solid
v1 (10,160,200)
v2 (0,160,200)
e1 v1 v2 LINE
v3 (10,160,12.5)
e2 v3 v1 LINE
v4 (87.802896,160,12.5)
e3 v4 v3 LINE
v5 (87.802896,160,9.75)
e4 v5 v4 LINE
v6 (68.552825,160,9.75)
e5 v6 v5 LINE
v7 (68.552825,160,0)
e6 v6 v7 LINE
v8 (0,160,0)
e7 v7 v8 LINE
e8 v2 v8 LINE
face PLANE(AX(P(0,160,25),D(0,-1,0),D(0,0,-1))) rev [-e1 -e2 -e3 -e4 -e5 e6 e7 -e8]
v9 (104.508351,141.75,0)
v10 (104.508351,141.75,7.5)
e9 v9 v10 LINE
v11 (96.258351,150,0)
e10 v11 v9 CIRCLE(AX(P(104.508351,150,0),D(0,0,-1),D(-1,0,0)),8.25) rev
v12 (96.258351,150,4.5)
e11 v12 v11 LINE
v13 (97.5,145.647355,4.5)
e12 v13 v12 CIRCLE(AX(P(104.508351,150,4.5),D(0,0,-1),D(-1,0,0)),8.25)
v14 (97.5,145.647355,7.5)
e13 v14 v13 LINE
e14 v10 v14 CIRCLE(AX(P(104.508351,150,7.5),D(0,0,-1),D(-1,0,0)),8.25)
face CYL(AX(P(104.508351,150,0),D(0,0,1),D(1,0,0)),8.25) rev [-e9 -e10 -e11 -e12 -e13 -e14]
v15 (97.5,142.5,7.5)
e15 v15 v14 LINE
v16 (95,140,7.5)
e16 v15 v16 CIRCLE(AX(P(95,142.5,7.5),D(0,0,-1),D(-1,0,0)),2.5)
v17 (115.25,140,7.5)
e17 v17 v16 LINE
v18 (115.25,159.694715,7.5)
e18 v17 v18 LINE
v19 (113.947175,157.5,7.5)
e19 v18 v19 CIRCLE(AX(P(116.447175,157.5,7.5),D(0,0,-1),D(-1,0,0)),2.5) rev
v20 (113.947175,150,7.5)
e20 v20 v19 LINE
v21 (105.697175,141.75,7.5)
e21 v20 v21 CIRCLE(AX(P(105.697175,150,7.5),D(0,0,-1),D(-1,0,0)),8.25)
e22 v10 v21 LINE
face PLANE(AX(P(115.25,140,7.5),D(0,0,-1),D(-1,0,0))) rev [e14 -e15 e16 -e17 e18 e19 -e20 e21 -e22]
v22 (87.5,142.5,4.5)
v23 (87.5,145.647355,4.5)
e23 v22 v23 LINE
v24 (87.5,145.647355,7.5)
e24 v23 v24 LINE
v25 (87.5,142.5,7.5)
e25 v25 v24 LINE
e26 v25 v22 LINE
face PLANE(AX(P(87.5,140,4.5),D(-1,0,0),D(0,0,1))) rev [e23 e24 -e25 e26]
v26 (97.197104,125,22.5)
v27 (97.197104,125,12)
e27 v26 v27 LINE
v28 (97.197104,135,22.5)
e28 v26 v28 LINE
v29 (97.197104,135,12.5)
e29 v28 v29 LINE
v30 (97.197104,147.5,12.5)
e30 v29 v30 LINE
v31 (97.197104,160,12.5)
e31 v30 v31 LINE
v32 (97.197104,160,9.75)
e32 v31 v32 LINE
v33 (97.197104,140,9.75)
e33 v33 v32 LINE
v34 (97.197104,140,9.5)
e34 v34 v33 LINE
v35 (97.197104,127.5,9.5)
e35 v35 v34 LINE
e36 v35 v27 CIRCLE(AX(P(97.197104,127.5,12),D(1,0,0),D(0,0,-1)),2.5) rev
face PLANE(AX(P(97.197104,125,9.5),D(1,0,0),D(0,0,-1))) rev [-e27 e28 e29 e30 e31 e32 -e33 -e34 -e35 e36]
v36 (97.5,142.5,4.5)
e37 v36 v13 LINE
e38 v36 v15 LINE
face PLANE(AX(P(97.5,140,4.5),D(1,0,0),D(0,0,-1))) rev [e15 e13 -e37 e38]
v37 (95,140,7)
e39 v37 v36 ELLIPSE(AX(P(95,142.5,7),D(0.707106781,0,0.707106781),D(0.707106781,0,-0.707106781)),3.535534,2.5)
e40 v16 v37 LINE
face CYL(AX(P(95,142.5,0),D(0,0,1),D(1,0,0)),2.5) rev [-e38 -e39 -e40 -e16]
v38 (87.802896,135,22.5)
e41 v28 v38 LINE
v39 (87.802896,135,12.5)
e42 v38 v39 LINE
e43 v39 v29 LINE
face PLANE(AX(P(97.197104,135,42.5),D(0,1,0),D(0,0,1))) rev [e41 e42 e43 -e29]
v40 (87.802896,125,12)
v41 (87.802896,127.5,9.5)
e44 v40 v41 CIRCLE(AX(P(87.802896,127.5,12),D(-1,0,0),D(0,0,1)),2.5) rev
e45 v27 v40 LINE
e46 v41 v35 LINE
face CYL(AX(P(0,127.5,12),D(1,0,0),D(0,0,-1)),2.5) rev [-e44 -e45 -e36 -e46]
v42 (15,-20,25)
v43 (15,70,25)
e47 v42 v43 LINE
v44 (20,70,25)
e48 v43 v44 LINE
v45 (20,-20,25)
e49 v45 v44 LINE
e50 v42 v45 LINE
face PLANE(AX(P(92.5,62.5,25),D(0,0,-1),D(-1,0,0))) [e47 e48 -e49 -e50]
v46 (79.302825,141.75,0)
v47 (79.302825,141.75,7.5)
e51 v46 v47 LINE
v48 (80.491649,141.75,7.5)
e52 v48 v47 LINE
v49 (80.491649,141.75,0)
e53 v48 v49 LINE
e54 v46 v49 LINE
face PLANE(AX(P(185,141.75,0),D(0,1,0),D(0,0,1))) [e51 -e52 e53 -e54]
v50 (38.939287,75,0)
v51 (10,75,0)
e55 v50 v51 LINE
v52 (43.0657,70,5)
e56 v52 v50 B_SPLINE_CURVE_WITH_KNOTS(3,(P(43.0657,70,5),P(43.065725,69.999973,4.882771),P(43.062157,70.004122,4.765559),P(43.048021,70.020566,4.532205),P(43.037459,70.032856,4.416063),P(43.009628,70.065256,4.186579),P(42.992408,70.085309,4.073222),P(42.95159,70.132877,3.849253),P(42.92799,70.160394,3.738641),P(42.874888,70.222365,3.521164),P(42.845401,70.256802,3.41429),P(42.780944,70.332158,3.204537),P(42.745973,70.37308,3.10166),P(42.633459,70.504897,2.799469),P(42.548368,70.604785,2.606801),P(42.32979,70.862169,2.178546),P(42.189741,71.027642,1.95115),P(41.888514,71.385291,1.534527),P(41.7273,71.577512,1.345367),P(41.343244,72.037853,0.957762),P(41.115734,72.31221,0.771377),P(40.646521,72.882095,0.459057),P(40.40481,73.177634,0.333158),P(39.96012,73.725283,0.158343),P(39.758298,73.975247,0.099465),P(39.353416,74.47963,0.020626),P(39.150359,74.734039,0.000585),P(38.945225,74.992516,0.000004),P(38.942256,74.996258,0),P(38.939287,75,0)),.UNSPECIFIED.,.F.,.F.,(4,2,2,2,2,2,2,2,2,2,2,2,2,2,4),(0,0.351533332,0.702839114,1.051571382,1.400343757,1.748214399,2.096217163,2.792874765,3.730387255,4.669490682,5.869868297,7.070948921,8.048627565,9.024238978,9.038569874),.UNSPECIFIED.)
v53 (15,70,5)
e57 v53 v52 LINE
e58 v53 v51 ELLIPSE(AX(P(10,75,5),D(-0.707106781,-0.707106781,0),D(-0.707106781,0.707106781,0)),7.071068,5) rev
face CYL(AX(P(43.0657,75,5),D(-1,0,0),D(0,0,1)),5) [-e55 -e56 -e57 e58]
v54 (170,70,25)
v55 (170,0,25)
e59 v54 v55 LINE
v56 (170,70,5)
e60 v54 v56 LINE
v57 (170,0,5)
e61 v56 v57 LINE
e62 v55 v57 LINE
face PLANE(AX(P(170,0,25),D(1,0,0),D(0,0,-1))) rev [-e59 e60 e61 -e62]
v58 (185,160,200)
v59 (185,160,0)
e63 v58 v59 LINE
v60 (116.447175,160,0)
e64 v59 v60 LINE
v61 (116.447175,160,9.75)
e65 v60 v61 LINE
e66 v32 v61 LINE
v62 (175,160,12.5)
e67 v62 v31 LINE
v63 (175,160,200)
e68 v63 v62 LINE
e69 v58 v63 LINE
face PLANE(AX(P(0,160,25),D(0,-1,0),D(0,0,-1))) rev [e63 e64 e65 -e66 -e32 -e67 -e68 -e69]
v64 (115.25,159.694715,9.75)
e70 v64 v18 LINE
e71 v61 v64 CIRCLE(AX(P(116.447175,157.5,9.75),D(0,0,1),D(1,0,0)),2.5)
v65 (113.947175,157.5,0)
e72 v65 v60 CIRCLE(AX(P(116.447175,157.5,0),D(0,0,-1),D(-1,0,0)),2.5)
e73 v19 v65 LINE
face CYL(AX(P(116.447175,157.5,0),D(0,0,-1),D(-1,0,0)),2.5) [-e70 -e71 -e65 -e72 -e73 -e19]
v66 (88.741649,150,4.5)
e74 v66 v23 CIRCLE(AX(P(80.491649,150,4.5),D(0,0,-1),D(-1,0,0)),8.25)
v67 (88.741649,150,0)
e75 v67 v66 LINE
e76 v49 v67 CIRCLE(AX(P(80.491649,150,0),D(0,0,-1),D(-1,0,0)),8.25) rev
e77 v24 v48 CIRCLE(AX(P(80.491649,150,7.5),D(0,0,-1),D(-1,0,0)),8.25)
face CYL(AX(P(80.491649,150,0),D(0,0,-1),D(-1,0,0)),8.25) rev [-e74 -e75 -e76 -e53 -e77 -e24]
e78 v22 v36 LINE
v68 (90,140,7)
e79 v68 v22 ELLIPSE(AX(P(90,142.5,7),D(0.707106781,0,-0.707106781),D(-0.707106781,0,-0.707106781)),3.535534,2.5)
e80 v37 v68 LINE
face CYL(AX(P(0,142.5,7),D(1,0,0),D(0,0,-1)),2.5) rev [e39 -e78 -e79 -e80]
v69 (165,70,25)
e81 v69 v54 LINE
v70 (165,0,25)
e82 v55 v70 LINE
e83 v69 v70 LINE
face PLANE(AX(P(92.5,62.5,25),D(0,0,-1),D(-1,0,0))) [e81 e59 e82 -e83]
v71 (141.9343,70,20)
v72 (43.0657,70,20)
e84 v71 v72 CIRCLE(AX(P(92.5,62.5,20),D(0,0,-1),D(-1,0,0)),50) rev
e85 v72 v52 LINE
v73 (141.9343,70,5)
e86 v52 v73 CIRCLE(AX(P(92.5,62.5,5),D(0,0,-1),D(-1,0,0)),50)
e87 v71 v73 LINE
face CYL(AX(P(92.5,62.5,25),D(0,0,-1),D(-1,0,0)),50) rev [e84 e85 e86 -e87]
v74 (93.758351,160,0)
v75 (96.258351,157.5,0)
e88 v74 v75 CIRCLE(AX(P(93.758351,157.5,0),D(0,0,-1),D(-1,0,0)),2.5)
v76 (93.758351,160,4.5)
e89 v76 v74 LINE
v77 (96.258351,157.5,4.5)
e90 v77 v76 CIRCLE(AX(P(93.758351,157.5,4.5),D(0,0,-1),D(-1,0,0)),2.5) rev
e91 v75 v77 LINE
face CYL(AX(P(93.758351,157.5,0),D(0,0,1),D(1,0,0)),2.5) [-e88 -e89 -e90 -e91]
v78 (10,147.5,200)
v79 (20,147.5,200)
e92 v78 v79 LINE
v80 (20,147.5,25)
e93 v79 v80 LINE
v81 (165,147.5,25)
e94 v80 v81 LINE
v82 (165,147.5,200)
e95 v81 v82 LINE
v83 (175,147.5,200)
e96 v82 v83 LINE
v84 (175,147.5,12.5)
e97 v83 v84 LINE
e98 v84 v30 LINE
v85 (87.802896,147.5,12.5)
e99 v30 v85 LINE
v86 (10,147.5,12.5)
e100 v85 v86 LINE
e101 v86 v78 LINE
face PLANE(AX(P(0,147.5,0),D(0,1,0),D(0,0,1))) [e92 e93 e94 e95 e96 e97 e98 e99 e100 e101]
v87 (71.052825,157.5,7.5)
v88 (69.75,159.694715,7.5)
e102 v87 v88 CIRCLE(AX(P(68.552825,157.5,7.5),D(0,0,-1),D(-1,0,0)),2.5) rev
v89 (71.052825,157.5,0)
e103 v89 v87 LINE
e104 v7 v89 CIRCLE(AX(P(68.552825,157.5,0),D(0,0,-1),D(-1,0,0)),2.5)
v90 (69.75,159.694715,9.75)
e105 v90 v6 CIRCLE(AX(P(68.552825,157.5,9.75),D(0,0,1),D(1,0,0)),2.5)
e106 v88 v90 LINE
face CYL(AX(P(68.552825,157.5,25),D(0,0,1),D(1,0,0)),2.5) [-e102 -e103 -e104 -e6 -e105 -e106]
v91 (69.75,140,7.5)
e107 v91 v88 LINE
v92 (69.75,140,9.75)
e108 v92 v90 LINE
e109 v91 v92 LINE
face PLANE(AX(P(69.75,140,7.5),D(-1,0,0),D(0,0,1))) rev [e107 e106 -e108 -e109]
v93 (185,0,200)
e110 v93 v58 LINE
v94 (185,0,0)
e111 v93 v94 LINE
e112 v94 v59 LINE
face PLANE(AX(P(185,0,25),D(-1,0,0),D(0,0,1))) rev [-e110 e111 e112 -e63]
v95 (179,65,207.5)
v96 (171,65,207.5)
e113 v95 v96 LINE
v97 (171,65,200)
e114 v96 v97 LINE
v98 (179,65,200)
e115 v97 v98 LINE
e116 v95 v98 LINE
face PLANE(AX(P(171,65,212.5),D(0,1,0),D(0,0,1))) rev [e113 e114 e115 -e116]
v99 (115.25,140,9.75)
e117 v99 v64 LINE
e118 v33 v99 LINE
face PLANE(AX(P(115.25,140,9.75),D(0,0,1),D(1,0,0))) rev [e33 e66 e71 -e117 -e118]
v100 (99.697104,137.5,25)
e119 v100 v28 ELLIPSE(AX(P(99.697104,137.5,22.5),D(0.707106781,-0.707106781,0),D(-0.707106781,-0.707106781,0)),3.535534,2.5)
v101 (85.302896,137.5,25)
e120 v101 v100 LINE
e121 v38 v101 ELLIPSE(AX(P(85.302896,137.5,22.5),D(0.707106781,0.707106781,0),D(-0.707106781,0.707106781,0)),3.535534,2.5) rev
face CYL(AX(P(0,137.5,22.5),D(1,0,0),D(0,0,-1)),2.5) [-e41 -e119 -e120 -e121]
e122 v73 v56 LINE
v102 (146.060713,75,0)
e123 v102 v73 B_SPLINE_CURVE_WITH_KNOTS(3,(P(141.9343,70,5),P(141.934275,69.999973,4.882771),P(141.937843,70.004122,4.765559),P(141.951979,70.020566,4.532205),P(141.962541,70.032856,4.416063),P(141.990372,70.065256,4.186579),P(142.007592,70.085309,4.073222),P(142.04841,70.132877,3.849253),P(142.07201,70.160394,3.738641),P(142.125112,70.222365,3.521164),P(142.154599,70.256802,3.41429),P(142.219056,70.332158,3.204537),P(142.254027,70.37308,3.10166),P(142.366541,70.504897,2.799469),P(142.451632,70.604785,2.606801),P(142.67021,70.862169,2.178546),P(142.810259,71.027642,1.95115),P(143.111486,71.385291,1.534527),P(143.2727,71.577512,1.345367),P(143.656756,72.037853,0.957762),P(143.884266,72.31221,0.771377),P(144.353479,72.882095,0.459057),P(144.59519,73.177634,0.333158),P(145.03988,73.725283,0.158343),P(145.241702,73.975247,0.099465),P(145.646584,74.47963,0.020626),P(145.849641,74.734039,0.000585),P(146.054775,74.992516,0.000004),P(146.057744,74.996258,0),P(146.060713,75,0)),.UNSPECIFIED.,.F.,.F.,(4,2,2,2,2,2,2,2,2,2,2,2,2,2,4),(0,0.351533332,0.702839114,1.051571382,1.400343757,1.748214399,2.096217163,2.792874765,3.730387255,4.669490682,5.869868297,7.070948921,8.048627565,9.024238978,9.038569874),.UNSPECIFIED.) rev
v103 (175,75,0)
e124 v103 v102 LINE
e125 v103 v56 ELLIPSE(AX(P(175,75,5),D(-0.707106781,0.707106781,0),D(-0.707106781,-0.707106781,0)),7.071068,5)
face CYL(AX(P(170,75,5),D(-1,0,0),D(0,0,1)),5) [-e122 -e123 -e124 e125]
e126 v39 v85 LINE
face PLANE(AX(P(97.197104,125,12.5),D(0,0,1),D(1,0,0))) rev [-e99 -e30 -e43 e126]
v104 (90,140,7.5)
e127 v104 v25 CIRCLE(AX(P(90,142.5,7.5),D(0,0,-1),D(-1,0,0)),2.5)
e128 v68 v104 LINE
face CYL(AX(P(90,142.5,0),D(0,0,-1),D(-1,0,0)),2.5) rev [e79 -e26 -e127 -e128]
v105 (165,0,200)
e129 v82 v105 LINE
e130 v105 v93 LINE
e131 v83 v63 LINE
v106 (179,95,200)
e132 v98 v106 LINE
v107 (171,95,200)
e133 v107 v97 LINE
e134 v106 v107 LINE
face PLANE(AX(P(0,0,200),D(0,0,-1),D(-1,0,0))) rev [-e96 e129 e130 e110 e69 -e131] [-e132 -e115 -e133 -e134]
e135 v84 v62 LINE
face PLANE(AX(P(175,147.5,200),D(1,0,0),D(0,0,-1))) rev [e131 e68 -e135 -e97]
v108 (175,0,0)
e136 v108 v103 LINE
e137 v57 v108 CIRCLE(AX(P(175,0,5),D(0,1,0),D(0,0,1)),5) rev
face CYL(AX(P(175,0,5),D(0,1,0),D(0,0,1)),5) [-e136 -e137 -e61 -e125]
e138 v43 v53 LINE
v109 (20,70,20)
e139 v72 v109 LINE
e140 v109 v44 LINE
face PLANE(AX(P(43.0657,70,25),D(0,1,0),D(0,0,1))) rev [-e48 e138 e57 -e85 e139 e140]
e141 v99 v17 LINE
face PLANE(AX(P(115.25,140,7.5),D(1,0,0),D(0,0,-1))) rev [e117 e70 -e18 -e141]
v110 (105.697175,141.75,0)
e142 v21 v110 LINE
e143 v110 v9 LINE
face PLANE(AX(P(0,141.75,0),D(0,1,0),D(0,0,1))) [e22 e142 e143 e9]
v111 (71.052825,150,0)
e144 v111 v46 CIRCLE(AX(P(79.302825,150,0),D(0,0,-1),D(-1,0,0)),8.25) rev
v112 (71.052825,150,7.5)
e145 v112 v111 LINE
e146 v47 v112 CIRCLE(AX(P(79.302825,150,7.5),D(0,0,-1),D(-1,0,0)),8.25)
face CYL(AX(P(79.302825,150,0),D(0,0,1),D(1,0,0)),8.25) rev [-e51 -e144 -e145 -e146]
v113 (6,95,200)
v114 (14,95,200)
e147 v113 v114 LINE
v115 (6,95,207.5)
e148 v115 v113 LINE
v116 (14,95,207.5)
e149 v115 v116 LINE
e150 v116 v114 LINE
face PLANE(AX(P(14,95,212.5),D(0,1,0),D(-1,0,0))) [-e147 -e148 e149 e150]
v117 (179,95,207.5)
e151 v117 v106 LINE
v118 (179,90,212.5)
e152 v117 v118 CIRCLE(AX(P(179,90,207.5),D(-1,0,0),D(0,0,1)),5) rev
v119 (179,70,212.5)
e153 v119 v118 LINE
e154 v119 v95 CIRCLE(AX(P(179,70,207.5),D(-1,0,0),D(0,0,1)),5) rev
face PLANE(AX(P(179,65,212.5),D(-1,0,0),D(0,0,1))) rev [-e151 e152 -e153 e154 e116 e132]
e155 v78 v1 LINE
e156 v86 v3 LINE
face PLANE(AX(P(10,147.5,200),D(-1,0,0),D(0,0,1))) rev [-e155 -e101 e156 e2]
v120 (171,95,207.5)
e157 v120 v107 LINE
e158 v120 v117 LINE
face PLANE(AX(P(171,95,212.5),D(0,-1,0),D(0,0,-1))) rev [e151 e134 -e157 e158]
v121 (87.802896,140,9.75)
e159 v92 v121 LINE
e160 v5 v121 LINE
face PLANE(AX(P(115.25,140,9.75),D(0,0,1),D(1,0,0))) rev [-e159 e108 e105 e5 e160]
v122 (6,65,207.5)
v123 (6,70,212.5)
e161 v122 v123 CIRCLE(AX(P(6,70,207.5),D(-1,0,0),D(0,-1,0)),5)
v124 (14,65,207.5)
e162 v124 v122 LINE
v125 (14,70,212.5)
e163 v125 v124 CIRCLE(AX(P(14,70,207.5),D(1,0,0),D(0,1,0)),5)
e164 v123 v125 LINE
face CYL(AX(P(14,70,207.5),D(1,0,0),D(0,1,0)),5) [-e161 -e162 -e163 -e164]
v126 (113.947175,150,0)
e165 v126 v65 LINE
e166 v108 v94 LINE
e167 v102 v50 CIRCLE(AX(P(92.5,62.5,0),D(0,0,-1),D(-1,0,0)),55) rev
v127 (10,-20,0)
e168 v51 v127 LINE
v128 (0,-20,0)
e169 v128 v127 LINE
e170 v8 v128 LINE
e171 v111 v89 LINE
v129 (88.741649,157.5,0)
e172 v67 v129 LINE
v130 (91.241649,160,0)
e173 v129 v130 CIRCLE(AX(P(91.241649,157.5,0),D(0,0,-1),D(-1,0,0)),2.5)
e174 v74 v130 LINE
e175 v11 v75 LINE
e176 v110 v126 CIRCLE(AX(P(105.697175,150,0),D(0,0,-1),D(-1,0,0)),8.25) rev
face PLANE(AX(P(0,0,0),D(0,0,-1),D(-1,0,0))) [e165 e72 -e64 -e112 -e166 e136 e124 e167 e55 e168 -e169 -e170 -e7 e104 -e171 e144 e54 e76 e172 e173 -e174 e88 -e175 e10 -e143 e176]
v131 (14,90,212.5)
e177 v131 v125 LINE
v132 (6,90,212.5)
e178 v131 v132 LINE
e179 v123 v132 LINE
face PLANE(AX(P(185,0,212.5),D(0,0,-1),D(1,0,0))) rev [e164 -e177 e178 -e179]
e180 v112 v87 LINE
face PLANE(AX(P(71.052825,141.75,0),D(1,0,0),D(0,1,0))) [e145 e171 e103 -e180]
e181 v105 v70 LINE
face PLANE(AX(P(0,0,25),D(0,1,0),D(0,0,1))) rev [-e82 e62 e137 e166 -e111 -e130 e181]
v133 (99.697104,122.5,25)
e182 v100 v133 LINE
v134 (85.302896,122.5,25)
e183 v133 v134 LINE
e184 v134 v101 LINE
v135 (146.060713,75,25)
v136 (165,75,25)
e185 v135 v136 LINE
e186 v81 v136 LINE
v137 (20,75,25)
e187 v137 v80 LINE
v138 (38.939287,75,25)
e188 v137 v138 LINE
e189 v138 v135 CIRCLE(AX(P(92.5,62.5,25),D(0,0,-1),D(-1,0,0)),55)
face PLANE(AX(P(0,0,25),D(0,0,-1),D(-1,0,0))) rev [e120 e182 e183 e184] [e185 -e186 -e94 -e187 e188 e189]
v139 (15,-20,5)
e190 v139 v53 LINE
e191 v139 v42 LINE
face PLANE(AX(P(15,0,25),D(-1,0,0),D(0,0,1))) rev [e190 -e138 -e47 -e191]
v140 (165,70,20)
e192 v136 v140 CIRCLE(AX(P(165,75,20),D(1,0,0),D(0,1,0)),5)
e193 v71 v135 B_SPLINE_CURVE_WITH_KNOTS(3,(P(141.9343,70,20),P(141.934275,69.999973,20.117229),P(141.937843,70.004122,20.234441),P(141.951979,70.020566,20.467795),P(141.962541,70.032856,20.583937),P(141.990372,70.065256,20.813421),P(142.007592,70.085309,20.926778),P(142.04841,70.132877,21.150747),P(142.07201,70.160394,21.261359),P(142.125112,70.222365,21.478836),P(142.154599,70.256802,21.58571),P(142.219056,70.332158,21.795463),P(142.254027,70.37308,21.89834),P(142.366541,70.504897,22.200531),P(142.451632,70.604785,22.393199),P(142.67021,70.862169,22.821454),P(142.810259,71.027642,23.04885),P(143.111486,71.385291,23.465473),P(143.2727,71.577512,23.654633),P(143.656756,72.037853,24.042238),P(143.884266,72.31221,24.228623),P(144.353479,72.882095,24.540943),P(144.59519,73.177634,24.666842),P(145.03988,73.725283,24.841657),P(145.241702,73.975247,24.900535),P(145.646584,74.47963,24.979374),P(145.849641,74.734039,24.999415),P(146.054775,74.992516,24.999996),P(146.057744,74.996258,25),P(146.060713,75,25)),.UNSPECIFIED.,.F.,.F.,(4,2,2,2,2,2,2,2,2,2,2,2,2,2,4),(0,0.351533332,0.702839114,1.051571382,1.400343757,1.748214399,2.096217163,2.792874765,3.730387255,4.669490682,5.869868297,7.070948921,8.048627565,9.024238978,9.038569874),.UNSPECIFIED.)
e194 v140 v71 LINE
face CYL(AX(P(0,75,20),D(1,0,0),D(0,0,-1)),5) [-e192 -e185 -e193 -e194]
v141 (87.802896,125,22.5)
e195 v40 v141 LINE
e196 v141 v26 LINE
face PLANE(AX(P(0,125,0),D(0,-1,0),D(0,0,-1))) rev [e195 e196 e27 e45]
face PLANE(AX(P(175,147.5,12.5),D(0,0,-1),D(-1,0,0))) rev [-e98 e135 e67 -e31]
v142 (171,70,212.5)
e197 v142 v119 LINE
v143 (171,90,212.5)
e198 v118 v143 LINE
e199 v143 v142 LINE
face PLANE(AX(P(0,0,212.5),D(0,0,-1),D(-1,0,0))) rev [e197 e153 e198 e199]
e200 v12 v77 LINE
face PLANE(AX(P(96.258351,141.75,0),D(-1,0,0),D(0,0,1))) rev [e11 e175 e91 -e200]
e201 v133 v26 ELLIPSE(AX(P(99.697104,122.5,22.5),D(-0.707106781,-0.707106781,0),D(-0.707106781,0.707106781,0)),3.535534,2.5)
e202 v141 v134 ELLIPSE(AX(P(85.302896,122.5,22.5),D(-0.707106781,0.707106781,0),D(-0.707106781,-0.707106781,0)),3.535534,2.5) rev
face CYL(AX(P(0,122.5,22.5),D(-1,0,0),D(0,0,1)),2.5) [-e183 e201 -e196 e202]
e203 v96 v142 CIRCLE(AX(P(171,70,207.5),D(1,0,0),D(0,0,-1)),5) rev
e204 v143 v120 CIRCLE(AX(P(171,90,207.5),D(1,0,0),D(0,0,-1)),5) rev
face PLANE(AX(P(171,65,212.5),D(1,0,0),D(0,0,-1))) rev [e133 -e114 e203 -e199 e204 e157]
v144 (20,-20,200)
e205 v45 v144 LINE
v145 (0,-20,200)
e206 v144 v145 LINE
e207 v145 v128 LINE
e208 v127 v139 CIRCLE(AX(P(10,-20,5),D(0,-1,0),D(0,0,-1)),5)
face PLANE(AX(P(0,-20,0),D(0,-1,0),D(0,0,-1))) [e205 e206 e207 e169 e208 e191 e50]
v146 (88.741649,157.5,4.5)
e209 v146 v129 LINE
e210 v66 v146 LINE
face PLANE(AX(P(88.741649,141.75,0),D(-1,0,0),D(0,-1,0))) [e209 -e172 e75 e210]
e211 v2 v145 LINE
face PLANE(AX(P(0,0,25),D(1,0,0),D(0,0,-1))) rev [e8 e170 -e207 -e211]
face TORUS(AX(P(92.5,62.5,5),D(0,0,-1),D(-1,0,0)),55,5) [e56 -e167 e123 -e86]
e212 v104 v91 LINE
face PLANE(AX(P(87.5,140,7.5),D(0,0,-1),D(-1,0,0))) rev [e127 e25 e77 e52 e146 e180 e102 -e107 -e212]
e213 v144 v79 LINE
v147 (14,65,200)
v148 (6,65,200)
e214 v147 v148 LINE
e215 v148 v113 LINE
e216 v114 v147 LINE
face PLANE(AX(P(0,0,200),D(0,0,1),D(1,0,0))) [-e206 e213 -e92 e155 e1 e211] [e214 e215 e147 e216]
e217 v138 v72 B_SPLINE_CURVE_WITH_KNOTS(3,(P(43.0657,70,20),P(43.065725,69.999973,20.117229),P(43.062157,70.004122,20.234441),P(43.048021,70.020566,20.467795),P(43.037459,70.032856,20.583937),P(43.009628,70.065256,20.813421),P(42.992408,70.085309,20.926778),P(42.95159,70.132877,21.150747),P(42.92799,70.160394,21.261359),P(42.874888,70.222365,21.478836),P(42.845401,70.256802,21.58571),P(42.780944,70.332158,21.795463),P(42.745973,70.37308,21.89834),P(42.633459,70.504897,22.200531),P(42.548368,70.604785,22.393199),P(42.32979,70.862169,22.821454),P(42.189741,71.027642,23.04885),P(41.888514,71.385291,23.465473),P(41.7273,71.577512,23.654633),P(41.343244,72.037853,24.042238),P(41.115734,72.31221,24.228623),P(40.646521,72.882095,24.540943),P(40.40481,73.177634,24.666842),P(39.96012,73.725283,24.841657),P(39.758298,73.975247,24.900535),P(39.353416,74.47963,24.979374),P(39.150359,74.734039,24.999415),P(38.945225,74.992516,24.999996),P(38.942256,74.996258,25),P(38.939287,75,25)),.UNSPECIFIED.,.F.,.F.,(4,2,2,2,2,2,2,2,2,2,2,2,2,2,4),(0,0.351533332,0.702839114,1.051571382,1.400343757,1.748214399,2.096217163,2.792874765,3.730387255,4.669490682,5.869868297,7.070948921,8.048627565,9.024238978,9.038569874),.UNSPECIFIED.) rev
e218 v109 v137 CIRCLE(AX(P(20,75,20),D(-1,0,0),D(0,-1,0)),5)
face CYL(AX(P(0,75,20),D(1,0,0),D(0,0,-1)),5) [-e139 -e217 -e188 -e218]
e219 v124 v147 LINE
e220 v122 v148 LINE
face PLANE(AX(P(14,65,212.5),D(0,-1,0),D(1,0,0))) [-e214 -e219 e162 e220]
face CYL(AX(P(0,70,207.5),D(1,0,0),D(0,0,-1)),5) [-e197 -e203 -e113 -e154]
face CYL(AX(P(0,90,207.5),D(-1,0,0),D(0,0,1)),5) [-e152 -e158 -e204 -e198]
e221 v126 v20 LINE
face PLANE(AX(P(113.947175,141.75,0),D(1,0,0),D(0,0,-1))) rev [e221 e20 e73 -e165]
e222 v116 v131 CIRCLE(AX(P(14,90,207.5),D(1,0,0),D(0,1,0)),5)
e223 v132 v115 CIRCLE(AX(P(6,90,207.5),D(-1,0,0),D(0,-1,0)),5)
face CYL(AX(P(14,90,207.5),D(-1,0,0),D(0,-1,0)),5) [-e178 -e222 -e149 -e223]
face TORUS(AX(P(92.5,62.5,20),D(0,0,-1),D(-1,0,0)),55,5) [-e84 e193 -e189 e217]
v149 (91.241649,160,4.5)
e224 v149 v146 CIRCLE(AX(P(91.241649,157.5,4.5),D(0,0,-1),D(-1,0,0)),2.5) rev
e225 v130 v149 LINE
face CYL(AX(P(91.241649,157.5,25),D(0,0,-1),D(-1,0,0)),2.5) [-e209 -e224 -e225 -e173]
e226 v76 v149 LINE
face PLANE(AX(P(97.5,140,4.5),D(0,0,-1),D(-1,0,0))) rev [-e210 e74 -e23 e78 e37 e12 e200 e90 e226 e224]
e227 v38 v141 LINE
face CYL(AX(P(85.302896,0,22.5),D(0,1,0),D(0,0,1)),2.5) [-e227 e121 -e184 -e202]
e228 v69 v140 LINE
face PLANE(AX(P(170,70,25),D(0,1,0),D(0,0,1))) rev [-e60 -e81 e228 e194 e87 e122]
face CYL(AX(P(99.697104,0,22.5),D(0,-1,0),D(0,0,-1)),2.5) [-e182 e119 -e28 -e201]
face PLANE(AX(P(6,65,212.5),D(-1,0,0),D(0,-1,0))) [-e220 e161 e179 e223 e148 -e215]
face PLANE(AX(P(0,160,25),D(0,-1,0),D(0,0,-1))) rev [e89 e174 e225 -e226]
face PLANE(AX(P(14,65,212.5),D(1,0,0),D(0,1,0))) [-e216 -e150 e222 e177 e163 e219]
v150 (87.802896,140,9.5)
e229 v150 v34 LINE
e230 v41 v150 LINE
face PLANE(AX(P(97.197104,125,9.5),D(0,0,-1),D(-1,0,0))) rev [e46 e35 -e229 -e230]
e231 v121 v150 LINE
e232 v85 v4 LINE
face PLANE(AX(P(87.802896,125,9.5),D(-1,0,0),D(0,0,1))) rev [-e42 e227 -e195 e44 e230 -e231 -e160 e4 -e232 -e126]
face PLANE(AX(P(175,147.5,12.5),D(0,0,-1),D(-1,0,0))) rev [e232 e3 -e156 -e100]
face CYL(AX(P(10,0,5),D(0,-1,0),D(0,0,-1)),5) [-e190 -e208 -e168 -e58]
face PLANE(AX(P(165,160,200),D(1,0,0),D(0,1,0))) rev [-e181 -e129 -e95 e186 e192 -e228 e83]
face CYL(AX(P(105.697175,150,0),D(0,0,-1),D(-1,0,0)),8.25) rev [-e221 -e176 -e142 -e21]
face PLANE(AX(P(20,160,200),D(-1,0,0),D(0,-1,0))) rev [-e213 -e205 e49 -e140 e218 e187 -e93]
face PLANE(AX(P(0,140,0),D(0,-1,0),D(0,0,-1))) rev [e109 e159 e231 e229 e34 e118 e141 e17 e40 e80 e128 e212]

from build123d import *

# Parameters (mm, degrees)
SKETCH1_W            = 185
SKETCH1_H            = 160
BOSS_EXTRUDE1_DEPTH  = 25
SKETCH2_W            = 20
SKETCH2_H            = 160
BOSS_EXTRUDE2_DEPTH  = 175
SKETCH5_W            = 20
SKETCH5_H            = 200
BOSS_EXTRUDE3_DEPTH  = 20
CUT_EXTRUDE1_DEPTH   = 25
SKETCH6_W            = 5
SKETCH6_H            = 25
CUT_EXTRUDE2_DEPTH   = 20
FILLET2_R            = 5
SKETCH7_W            = 8
SKETCH7_H            = 30
BOSS_EXTRUDE4_DEPTH  = 12.5
FILLET3_R            = 5
FILLET3_OF_MIRROR1_R = 5
SKETCH8_W            = 165
SKETCH8_H            = 187.5
CUT_EXTRUDE3_DEPTH   = 12.5
SKETCH10_R           = 8.25
CUT_EXTRUDE4_DEPTH   = 7.5
CUT_EXTRUDE5_DEPTH   = 20
SKETCH12_W           = 17.688824297
SKETCH12_H           = 7.5
CUT_EXTRUDE6_DEPTH   = 18.25
FILLET4_R            = 8.25
FILLET4_OF_MIRROR2_R = 8.25
SKETCH14_W           = 9.39420862
SKETCH14_H           = 3
CUT_EXTRUDE7_DEPTH   = 35
SKETCH15_W           = 9.39420862
SKETCH15_H           = 10
CUT_EXTRUDE8_DEPTH   = 30
FILLET5_R            = 2.5


with BuildPart() as part:
    # Sketch1 → Boss-Extrude1 (new body)
    with BuildSketch(Plane.XY):
        with Locations((92.5, 80)):
            Rectangle(SKETCH1_W, SKETCH1_H)
    extrude(amount=BOSS_EXTRUDE1_DEPTH)

    # Sketch2 → Boss-Extrude2 (add)
    with BuildSketch(Plane.XY.offset(25)):
        with Locations((10, 80)):
            Rectangle(SKETCH2_W, SKETCH2_H)
        with Locations((175, 80)):
            Rectangle(SKETCH2_W, SKETCH2_H)
    extrude(amount=BOSS_EXTRUDE2_DEPTH)

    # Sketch5 → Boss-Extrude3 (add)
    with BuildSketch(Plane.XZ):
        with Locations((10, 100)):
            Rectangle(SKETCH5_W, SKETCH5_H)
    extrude(amount=BOSS_EXTRUDE3_DEPTH)

    # Sketch3 → Cut-Extrude1 (cut)
    with BuildSketch(Plane(origin=(0, 0, 0), x_dir=(-1, 0, 0), z_dir=(0, 0, -1))):
        with BuildLine():
            Line((-170, 0), (-15, 0))
            Line((-15, 0), (-15, 70))
            Line((-15, 70), (-43.065700167, 70))
            ThreePointArc((-43.065700167, 70), (-92.5, 112.5), (-141.934299833, 70))
            Line((-141.934299833, 70), (-170, 70))
            Line((-170, 70), (-170, 0))
        make_face()
    extrude(amount=-CUT_EXTRUDE1_DEPTH, mode=Mode.SUBTRACT)

    # Sketch6 → Cut-Extrude2 (cut)
    with BuildSketch(Plane(origin=(0, 0, 0), x_dir=(1, 0, 0), z_dir=(0, 1, 0))):
        with Locations((17.5, -12.5)):
            Rectangle(SKETCH6_W, SKETCH6_H)
    extrude(amount=-CUT_EXTRUDE2_DEPTH, mode=Mode.SUBTRACT)

    # Fillet2
    fillet2_edges = [part.edges().sort_by_distance(p)[0] for p in [
        (153.467149917, 70, 25),
        (92.5, 112.5, 25),
        (31.532850083, 70, 25),
        (170, 35, 0),
        (15, 25, 0),
        (29.032850083, 70, 0),
        (92.5, 112.5, 0),
        (155.967149917, 70, 0),
    ]]
    fillet(fillet2_edges, radius=FILLET2_R)

    # Sketch7 → Boss-Extrude4 (add)
    with BuildSketch(Plane.XY.offset(200)):
        with Locations((175, 80)):
            Rectangle(SKETCH7_W, SKETCH7_H)
    boss_extrude4 = extrude(amount=BOSS_EXTRUDE4_DEPTH)

    # Fillet3
    fillet3_edges = [part.edges().sort_by_distance(p)[0] for p in [
        (175, 95, 212.5),
        (175, 65, 212.5),
    ]]
    fillet(fillet3_edges, radius=FILLET3_R)

    # Mirror1: Boss-Extrude4 across plane
    add(boss_extrude4.mirror(Plane.ZY.offset(-92.5)))

    # Fillet3 of Mirror1
    fillet3_of_mirror1_edges = [part.edges().sort_by_distance(p)[0] for p in [
        (10, 95, 212.5),
        (10, 65, 212.5),
    ]]
    fillet(fillet3_of_mirror1_edges, radius=FILLET3_OF_MIRROR1_R)

    # Sketch8 → Cut-Extrude3 (cut)
    with BuildSketch(Plane(origin=(0, 160, 0), x_dir=(1, 0, 0), z_dir=(0, 1, 0))):
        with Locations((92.5, -106.25)):
            Rectangle(SKETCH8_W, SKETCH8_H)
    extrude(amount=-CUT_EXTRUDE3_DEPTH, mode=Mode.SUBTRACT)

    # Sketch10 → Cut-Extrude4 (cut)
    with BuildSketch(Plane(origin=(0, 0, 0), x_dir=(-1, 0, 0), z_dir=(0, 0, -1))):
        with Locations((-105, 150)):
            Circle(SKETCH10_R)
        with Locations(Location((-80, 150, 0), (0, 0, 180))):
            Circle(SKETCH10_R)
    extrude(amount=-CUT_EXTRUDE4_DEPTH, mode=Mode.SUBTRACT)

    # Sketch11 → Cut-Extrude5 (cut)
    with BuildSketch(Plane(origin=(0, 160, 0), x_dir=(1, 0, 0), z_dir=(0, 1, 0))):
        Polygon((87.5, -7.5), (69.75, -7.5), (69.75, -9.75), (115.25, -9.75), (115.25, -7.5), (97.5, -7.5), (97.5, -4.5), (87.5, -4.5), align=None)
    extrude(amount=-CUT_EXTRUDE5_DEPTH, mode=Mode.SUBTRACT)

    # Sketch12 → Cut-Extrude6 (cut)
    with BuildSketch(Plane(origin=(0, 160, 0), x_dir=(1, 0, 0), z_dir=(0, 1, 0))):
        with Locations((105.102762798, -3.75)):
            Rectangle(SKETCH12_W, SKETCH12_H)
    cut_extrude6 = extrude(amount=-CUT_EXTRUDE6_DEPTH, mode=Mode.SUBTRACT)

    # Fillet4
    fillet4_edges = [part.edges().sort_by_distance(p)[0] for p in [
        (96.258350649, 141.75, 2.25),
        (113.947174946, 141.75, 3.75),
    ]]
    fillet(fillet4_edges, radius=FILLET4_R)

    # Mirror2: Cut-Extrude6 across plane
    add(cut_extrude6.mirror(Plane.ZY.offset(-92.5)), mode=Mode.SUBTRACT)

    # Fillet4 of Mirror2
    fillet4_of_mirror2_edges = [part.edges().sort_by_distance(p)[0] for p in [
        (88.741649351, 141.75, 2.25),
        (71.052825054, 141.75, 3.75),
    ]]
    fillet(fillet4_of_mirror2_edges, radius=FILLET4_OF_MIRROR2_R)

    # Sketch14 → Cut-Extrude7 (cut)
    with BuildSketch(Plane(origin=(0, 160, 0), x_dir=(1, 0, 0), z_dir=(0, 1, 0))):
        with Locations((92.5, -11)):
            Rectangle(SKETCH14_W, SKETCH14_H)
    extrude(amount=-CUT_EXTRUDE7_DEPTH, mode=Mode.SUBTRACT)

    # Sketch15 → Cut-Extrude8 (cut)
    with BuildSketch(Plane(origin=(0, 0, 12.5), x_dir=(-1, 0, 0), z_dir=(0, 0, -1))):
        with Locations((-92.5, 130)):
            Rectangle(SKETCH15_W, SKETCH15_H)
    extrude(amount=-CUT_EXTRUDE8_DEPTH, mode=Mode.SUBTRACT)

    # Fillet5
    # the kernel refuses this fillet: 2.5 mm, written as the material it adds along each edge
    with BuildSketch(Plane(origin=(87.5, 140, 4.5), x_dir=(0, 1, 0), z_dir=(0, 0, 1)), Plane(origin=(97.5, 140, 7.5), x_dir=(0, 1, 0), z_dir=(0, 0, -1))) as fillet5_piece_1:
        with BuildLine():
            CenterArc((FILLET5_R, -FILLET5_R), FILLET5_R, 90, 90)
            Line((0, -FILLET5_R), (0, 0))
            Line((0, 0), (FILLET5_R, 0))
        make_face()
    extrude(amount=3)
    with BuildSketch(Plane(origin=(97.5, 140, 4.5), x_dir=(0, 1, 0), z_dir=(-1, 0, 0))) as fillet5_piece_2:
        with BuildLine():
            CenterArc((FILLET5_R, -FILLET5_R), FILLET5_R, 90, 90)
            Line((0, -FILLET5_R), (0, 0))
            Line((0, 0), (FILLET5_R, 0))
        make_face()
    extrude(amount=10)
    with BuildSketch(Plane(origin=(103.44710431, 125, 9.5), x_dir=(0, 1, 0), z_dir=(-1, 0, 0))) as fillet5_piece_3:
        with BuildLine():
            CenterArc((FILLET5_R, -FILLET5_R), FILLET5_R, 90, 90)
            Line((0, -FILLET5_R), (0, 0))
            Line((0, 0), (FILLET5_R, 0))
        make_face()
    extrude(amount=21.89420862)
    # the kernel refuses this fillet: 2.5 mm, written as the material it takes off along each edge
    with BuildSketch(Plane(origin=(96.258350649, 160, 10.75), x_dir=(0, -1, 0), z_dir=(0, 0, -1)), Plane(origin=(88.741649351, 160, 10.75), x_dir=(1, 0, 0), z_dir=(0, 0, -1))) as fillet5_2_piece_1:
        with BuildLine():
            CenterArc((FILLET5_R, FILLET5_R), FILLET5_R, 180, 90)
            Line((0, FILLET5_R), (0, 0))
            Line((0, 0), (FILLET5_R, 0))
        make_face()
    extrude(amount=17, mode=Mode.SUBTRACT)
    with BuildSketch(Plane(origin=(113.947174946, 160, -6.25), x_dir=(1, 0, 0), z_dir=(0, 0, 1))) as fillet5_2_piece_2_section:
        with BuildLine():
            CenterArc((FILLET5_R, -FILLET5_R), FILLET5_R, 90, 90)
            Line((0, -FILLET5_R), (0, 0))
            Line((0, 0), (FILLET5_R, 0))
        make_face()
    fillet5_2_piece_2 = extrude(amount=20, mode=Mode.PRIVATE)
    fillet5_2_piece_2 = split(fillet5_2_piece_2, bisect_by=Plane(origin=(113.947174946, 160, 9.75), z_dir=(0, 0, -1)), keep=Keep.TOP, mode=Mode.PRIVATE)
    add(fillet5_2_piece_2, mode=Mode.SUBTRACT)
    with BuildSketch(Plane(origin=(71.052825054, 160, -6.25), x_dir=(-1, 0, 0), z_dir=(0, 0, 1))) as fillet5_2_piece_3_section:
        with BuildLine():
            CenterArc((FILLET5_R, FILLET5_R), FILLET5_R, 180, 90)
            Line((0, FILLET5_R), (0, 0))
            Line((0, 0), (FILLET5_R, 0))
        make_face()
    fillet5_2_piece_3 = extrude(amount=20, mode=Mode.PRIVATE)
    fillet5_2_piece_3 = split(fillet5_2_piece_3, bisect_by=Plane(origin=(71.052825054, 160, 9.75), z_dir=(0, 0, -1)), keep=Keep.TOP, mode=Mode.PRIVATE)
    add(fillet5_2_piece_3, mode=Mode.SUBTRACT)
    with BuildSketch(Plane(origin=(97.19710431, 125, 25), x_dir=(0, 0, -1), z_dir=(0, 1, 0)), Plane(origin=(87.80289569, 135, 25), x_dir=(0, 0, -1), z_dir=(0, -1, 0))) as fillet5_2_piece_4:
        with BuildLine():
            CenterArc((FILLET5_R, -FILLET5_R), FILLET5_R, 90, 90)
            Line((0, -FILLET5_R), (0, 0))
            Line((0, 0), (FILLET5_R, 0))
        make_face()
    extrude(amount=10, mode=Mode.SUBTRACT)
    with BuildSketch(Plane(origin=(97.19710431, 135, 25), x_dir=(0, 0, -1), z_dir=(-1, 0, 0)), Plane(origin=(87.80289569, 125, 25), x_dir=(0, 0, -1), z_dir=(1, 0, 0))) as fillet5_2_piece_5:
        with BuildLine():
            CenterArc((FILLET5_R, -FILLET5_R), FILLET5_R, 90, 90)
            Line((0, -FILLET5_R), (0, 0))
            Line((0, 0), (FILLET5_R, 0))
        make_face()
    extrude(amount=9.39420862, mode=Mode.SUBTRACT)
    with BuildSketch(Plane(origin=(97.19710431, 118.75, 25), x_dir=(0, 0, -1), z_dir=(0, 1, 0))) as fillet5_2_piece_6a_section:
        with BuildLine():
            CenterArc((FILLET5_R, -FILLET5_R), FILLET5_R, 90, 90)
            Line((0, -FILLET5_R), (0, 0))
            Line((0, 0), (FILLET5_R, 0))
        make_face()
    fillet5_2_piece_6a = extrude(amount=16.25, mode=Mode.PRIVATE)
    fillet5_2_piece_6a = split(fillet5_2_piece_6a, bisect_by=Plane(origin=(97.19710431, 125, 25), z_dir=(0, -1, 0)), keep=Keep.TOP, mode=Mode.PRIVATE)
    with BuildSketch(Plane(origin=(87.80289569, 125, 25), x_dir=(0, 0, -1), z_dir=(1, 0, 0))) as fillet5_2_piece_6b_section:
        with BuildLine():
            CenterArc((FILLET5_R, -FILLET5_R), FILLET5_R, 90, 90)
            Line((0, -FILLET5_R), (0, 0))
            Line((0, 0), (FILLET5_R, 0))
        make_face()
    fillet5_2_piece_6b = extrude(amount=15.64420862, mode=Mode.PRIVATE)
    fillet5_2_piece_6b = split(fillet5_2_piece_6b, bisect_by=Plane(origin=(97.19710431, 125, 25), z_dir=(1, 0, 0)), keep=Keep.TOP, mode=Mode.PRIVATE)
    fillet5_2_piece_6 = fillet5_2_piece_6a & fillet5_2_piece_6b
    add(fillet5_2_piece_6, mode=Mode.SUBTRACT)
    with BuildSketch(Plane(origin=(97.19710431, 125, 25), x_dir=(0, 0, -1), z_dir=(0, 1, 0))) as fillet5_2_piece_7a_section:
        with BuildLine():
            CenterArc((FILLET5_R, -FILLET5_R), FILLET5_R, 90, 90)
            Line((0, -FILLET5_R), (0, 0))
            Line((0, 0), (FILLET5_R, 0))
        make_face()
    fillet5_2_piece_7a = extrude(amount=16.25, mode=Mode.PRIVATE)
    fillet5_2_piece_7a = split(fillet5_2_piece_7a, bisect_by=Plane(origin=(97.19710431, 135, 25), z_dir=(0, 1, 0)), keep=Keep.TOP, mode=Mode.PRIVATE)
    with BuildSketch(Plane(origin=(103.44710431, 135, 25), x_dir=(0, 0, -1), z_dir=(-1, 0, 0))) as fillet5_2_piece_7b_section:
        with BuildLine():
            CenterArc((FILLET5_R, -FILLET5_R), FILLET5_R, 90, 90)
            Line((0, -FILLET5_R), (0, 0))
            Line((0, 0), (FILLET5_R, 0))
        make_face()
    fillet5_2_piece_7b = extrude(amount=15.64420862, mode=Mode.PRIVATE)
    fillet5_2_piece_7b = split(fillet5_2_piece_7b, bisect_by=Plane(origin=(97.19710431, 135, 25), z_dir=(1, 0, 0)), keep=Keep.TOP, mode=Mode.PRIVATE)
    fillet5_2_piece_7 = fillet5_2_piece_7a & fillet5_2_piece_7b
    add(fillet5_2_piece_7, mode=Mode.SUBTRACT)
    with BuildSketch(Plane(origin=(97.19710431, 135, 25), x_dir=(0, 0, -1), z_dir=(-1, 0, 0))) as fillet5_2_piece_8a_section:
        with BuildLine():
            CenterArc((FILLET5_R, -FILLET5_R), FILLET5_R, 90, 90)
            Line((0, -FILLET5_R), (0, 0))
            Line((0, 0), (FILLET5_R, 0))
        make_face()
    fillet5_2_piece_8a = extrude(amount=15.64420862, mode=Mode.PRIVATE)
    fillet5_2_piece_8a = split(fillet5_2_piece_8a, bisect_by=Plane(origin=(87.80289569, 135, 25), z_dir=(-1, 0, 0)), keep=Keep.TOP, mode=Mode.PRIVATE)
    with BuildSketch(Plane(origin=(87.80289569, 141.25, 25), x_dir=(0, 0, -1), z_dir=(0, -1, 0))) as fillet5_2_piece_8b_section:
        with BuildLine():
            CenterArc((FILLET5_R, -FILLET5_R), FILLET5_R, 90, 90)
            Line((0, -FILLET5_R), (0, 0))
            Line((0, 0), (FILLET5_R, 0))
        make_face()
    fillet5_2_piece_8b = extrude(amount=16.25, mode=Mode.PRIVATE)
    fillet5_2_piece_8b = split(fillet5_2_piece_8b, bisect_by=Plane(origin=(87.80289569, 135, 25), z_dir=(0, 1, 0)), keep=Keep.TOP, mode=Mode.PRIVATE)
    fillet5_2_piece_8 = fillet5_2_piece_8a & fillet5_2_piece_8b
    add(fillet5_2_piece_8, mode=Mode.SUBTRACT)
    with BuildSketch(Plane(origin=(87.80289569, 135, 25), x_dir=(0, 0, -1), z_dir=(0, -1, 0))) as fillet5_2_piece_9a_section:
        with BuildLine():
            CenterArc((FILLET5_R, -FILLET5_R), FILLET5_R, 90, 90)
            Line((0, -FILLET5_R), (0, 0))
            Line((0, 0), (FILLET5_R, 0))
        make_face()
    fillet5_2_piece_9a = extrude(amount=16.25, mode=Mode.PRIVATE)
    fillet5_2_piece_9a = split(fillet5_2_piece_9a, bisect_by=Plane(origin=(87.80289569, 125, 25), z_dir=(0, -1, 0)), keep=Keep.TOP, mode=Mode.PRIVATE)
    with BuildSketch(Plane(origin=(81.55289569, 125, 25), x_dir=(0, 0, -1), z_dir=(1, 0, 0))) as fillet5_2_piece_9b_section:
        with BuildLine():
            CenterArc((FILLET5_R, -FILLET5_R), FILLET5_R, 90, 90)
            Line((0, -FILLET5_R), (0, 0))
            Line((0, 0), (FILLET5_R, 0))
        make_face()
    fillet5_2_piece_9b = extrude(amount=15.64420862, mode=Mode.PRIVATE)
    fillet5_2_piece_9b = split(fillet5_2_piece_9b, bisect_by=Plane(origin=(87.80289569, 125, 25), z_dir=(-1, 0, 0)), keep=Keep.TOP, mode=Mode.PRIVATE)
    fillet5_2_piece_9 = fillet5_2_piece_9a & fillet5_2_piece_9b
    add(fillet5_2_piece_9, mode=Mode.SUBTRACT)


solid = part.part
